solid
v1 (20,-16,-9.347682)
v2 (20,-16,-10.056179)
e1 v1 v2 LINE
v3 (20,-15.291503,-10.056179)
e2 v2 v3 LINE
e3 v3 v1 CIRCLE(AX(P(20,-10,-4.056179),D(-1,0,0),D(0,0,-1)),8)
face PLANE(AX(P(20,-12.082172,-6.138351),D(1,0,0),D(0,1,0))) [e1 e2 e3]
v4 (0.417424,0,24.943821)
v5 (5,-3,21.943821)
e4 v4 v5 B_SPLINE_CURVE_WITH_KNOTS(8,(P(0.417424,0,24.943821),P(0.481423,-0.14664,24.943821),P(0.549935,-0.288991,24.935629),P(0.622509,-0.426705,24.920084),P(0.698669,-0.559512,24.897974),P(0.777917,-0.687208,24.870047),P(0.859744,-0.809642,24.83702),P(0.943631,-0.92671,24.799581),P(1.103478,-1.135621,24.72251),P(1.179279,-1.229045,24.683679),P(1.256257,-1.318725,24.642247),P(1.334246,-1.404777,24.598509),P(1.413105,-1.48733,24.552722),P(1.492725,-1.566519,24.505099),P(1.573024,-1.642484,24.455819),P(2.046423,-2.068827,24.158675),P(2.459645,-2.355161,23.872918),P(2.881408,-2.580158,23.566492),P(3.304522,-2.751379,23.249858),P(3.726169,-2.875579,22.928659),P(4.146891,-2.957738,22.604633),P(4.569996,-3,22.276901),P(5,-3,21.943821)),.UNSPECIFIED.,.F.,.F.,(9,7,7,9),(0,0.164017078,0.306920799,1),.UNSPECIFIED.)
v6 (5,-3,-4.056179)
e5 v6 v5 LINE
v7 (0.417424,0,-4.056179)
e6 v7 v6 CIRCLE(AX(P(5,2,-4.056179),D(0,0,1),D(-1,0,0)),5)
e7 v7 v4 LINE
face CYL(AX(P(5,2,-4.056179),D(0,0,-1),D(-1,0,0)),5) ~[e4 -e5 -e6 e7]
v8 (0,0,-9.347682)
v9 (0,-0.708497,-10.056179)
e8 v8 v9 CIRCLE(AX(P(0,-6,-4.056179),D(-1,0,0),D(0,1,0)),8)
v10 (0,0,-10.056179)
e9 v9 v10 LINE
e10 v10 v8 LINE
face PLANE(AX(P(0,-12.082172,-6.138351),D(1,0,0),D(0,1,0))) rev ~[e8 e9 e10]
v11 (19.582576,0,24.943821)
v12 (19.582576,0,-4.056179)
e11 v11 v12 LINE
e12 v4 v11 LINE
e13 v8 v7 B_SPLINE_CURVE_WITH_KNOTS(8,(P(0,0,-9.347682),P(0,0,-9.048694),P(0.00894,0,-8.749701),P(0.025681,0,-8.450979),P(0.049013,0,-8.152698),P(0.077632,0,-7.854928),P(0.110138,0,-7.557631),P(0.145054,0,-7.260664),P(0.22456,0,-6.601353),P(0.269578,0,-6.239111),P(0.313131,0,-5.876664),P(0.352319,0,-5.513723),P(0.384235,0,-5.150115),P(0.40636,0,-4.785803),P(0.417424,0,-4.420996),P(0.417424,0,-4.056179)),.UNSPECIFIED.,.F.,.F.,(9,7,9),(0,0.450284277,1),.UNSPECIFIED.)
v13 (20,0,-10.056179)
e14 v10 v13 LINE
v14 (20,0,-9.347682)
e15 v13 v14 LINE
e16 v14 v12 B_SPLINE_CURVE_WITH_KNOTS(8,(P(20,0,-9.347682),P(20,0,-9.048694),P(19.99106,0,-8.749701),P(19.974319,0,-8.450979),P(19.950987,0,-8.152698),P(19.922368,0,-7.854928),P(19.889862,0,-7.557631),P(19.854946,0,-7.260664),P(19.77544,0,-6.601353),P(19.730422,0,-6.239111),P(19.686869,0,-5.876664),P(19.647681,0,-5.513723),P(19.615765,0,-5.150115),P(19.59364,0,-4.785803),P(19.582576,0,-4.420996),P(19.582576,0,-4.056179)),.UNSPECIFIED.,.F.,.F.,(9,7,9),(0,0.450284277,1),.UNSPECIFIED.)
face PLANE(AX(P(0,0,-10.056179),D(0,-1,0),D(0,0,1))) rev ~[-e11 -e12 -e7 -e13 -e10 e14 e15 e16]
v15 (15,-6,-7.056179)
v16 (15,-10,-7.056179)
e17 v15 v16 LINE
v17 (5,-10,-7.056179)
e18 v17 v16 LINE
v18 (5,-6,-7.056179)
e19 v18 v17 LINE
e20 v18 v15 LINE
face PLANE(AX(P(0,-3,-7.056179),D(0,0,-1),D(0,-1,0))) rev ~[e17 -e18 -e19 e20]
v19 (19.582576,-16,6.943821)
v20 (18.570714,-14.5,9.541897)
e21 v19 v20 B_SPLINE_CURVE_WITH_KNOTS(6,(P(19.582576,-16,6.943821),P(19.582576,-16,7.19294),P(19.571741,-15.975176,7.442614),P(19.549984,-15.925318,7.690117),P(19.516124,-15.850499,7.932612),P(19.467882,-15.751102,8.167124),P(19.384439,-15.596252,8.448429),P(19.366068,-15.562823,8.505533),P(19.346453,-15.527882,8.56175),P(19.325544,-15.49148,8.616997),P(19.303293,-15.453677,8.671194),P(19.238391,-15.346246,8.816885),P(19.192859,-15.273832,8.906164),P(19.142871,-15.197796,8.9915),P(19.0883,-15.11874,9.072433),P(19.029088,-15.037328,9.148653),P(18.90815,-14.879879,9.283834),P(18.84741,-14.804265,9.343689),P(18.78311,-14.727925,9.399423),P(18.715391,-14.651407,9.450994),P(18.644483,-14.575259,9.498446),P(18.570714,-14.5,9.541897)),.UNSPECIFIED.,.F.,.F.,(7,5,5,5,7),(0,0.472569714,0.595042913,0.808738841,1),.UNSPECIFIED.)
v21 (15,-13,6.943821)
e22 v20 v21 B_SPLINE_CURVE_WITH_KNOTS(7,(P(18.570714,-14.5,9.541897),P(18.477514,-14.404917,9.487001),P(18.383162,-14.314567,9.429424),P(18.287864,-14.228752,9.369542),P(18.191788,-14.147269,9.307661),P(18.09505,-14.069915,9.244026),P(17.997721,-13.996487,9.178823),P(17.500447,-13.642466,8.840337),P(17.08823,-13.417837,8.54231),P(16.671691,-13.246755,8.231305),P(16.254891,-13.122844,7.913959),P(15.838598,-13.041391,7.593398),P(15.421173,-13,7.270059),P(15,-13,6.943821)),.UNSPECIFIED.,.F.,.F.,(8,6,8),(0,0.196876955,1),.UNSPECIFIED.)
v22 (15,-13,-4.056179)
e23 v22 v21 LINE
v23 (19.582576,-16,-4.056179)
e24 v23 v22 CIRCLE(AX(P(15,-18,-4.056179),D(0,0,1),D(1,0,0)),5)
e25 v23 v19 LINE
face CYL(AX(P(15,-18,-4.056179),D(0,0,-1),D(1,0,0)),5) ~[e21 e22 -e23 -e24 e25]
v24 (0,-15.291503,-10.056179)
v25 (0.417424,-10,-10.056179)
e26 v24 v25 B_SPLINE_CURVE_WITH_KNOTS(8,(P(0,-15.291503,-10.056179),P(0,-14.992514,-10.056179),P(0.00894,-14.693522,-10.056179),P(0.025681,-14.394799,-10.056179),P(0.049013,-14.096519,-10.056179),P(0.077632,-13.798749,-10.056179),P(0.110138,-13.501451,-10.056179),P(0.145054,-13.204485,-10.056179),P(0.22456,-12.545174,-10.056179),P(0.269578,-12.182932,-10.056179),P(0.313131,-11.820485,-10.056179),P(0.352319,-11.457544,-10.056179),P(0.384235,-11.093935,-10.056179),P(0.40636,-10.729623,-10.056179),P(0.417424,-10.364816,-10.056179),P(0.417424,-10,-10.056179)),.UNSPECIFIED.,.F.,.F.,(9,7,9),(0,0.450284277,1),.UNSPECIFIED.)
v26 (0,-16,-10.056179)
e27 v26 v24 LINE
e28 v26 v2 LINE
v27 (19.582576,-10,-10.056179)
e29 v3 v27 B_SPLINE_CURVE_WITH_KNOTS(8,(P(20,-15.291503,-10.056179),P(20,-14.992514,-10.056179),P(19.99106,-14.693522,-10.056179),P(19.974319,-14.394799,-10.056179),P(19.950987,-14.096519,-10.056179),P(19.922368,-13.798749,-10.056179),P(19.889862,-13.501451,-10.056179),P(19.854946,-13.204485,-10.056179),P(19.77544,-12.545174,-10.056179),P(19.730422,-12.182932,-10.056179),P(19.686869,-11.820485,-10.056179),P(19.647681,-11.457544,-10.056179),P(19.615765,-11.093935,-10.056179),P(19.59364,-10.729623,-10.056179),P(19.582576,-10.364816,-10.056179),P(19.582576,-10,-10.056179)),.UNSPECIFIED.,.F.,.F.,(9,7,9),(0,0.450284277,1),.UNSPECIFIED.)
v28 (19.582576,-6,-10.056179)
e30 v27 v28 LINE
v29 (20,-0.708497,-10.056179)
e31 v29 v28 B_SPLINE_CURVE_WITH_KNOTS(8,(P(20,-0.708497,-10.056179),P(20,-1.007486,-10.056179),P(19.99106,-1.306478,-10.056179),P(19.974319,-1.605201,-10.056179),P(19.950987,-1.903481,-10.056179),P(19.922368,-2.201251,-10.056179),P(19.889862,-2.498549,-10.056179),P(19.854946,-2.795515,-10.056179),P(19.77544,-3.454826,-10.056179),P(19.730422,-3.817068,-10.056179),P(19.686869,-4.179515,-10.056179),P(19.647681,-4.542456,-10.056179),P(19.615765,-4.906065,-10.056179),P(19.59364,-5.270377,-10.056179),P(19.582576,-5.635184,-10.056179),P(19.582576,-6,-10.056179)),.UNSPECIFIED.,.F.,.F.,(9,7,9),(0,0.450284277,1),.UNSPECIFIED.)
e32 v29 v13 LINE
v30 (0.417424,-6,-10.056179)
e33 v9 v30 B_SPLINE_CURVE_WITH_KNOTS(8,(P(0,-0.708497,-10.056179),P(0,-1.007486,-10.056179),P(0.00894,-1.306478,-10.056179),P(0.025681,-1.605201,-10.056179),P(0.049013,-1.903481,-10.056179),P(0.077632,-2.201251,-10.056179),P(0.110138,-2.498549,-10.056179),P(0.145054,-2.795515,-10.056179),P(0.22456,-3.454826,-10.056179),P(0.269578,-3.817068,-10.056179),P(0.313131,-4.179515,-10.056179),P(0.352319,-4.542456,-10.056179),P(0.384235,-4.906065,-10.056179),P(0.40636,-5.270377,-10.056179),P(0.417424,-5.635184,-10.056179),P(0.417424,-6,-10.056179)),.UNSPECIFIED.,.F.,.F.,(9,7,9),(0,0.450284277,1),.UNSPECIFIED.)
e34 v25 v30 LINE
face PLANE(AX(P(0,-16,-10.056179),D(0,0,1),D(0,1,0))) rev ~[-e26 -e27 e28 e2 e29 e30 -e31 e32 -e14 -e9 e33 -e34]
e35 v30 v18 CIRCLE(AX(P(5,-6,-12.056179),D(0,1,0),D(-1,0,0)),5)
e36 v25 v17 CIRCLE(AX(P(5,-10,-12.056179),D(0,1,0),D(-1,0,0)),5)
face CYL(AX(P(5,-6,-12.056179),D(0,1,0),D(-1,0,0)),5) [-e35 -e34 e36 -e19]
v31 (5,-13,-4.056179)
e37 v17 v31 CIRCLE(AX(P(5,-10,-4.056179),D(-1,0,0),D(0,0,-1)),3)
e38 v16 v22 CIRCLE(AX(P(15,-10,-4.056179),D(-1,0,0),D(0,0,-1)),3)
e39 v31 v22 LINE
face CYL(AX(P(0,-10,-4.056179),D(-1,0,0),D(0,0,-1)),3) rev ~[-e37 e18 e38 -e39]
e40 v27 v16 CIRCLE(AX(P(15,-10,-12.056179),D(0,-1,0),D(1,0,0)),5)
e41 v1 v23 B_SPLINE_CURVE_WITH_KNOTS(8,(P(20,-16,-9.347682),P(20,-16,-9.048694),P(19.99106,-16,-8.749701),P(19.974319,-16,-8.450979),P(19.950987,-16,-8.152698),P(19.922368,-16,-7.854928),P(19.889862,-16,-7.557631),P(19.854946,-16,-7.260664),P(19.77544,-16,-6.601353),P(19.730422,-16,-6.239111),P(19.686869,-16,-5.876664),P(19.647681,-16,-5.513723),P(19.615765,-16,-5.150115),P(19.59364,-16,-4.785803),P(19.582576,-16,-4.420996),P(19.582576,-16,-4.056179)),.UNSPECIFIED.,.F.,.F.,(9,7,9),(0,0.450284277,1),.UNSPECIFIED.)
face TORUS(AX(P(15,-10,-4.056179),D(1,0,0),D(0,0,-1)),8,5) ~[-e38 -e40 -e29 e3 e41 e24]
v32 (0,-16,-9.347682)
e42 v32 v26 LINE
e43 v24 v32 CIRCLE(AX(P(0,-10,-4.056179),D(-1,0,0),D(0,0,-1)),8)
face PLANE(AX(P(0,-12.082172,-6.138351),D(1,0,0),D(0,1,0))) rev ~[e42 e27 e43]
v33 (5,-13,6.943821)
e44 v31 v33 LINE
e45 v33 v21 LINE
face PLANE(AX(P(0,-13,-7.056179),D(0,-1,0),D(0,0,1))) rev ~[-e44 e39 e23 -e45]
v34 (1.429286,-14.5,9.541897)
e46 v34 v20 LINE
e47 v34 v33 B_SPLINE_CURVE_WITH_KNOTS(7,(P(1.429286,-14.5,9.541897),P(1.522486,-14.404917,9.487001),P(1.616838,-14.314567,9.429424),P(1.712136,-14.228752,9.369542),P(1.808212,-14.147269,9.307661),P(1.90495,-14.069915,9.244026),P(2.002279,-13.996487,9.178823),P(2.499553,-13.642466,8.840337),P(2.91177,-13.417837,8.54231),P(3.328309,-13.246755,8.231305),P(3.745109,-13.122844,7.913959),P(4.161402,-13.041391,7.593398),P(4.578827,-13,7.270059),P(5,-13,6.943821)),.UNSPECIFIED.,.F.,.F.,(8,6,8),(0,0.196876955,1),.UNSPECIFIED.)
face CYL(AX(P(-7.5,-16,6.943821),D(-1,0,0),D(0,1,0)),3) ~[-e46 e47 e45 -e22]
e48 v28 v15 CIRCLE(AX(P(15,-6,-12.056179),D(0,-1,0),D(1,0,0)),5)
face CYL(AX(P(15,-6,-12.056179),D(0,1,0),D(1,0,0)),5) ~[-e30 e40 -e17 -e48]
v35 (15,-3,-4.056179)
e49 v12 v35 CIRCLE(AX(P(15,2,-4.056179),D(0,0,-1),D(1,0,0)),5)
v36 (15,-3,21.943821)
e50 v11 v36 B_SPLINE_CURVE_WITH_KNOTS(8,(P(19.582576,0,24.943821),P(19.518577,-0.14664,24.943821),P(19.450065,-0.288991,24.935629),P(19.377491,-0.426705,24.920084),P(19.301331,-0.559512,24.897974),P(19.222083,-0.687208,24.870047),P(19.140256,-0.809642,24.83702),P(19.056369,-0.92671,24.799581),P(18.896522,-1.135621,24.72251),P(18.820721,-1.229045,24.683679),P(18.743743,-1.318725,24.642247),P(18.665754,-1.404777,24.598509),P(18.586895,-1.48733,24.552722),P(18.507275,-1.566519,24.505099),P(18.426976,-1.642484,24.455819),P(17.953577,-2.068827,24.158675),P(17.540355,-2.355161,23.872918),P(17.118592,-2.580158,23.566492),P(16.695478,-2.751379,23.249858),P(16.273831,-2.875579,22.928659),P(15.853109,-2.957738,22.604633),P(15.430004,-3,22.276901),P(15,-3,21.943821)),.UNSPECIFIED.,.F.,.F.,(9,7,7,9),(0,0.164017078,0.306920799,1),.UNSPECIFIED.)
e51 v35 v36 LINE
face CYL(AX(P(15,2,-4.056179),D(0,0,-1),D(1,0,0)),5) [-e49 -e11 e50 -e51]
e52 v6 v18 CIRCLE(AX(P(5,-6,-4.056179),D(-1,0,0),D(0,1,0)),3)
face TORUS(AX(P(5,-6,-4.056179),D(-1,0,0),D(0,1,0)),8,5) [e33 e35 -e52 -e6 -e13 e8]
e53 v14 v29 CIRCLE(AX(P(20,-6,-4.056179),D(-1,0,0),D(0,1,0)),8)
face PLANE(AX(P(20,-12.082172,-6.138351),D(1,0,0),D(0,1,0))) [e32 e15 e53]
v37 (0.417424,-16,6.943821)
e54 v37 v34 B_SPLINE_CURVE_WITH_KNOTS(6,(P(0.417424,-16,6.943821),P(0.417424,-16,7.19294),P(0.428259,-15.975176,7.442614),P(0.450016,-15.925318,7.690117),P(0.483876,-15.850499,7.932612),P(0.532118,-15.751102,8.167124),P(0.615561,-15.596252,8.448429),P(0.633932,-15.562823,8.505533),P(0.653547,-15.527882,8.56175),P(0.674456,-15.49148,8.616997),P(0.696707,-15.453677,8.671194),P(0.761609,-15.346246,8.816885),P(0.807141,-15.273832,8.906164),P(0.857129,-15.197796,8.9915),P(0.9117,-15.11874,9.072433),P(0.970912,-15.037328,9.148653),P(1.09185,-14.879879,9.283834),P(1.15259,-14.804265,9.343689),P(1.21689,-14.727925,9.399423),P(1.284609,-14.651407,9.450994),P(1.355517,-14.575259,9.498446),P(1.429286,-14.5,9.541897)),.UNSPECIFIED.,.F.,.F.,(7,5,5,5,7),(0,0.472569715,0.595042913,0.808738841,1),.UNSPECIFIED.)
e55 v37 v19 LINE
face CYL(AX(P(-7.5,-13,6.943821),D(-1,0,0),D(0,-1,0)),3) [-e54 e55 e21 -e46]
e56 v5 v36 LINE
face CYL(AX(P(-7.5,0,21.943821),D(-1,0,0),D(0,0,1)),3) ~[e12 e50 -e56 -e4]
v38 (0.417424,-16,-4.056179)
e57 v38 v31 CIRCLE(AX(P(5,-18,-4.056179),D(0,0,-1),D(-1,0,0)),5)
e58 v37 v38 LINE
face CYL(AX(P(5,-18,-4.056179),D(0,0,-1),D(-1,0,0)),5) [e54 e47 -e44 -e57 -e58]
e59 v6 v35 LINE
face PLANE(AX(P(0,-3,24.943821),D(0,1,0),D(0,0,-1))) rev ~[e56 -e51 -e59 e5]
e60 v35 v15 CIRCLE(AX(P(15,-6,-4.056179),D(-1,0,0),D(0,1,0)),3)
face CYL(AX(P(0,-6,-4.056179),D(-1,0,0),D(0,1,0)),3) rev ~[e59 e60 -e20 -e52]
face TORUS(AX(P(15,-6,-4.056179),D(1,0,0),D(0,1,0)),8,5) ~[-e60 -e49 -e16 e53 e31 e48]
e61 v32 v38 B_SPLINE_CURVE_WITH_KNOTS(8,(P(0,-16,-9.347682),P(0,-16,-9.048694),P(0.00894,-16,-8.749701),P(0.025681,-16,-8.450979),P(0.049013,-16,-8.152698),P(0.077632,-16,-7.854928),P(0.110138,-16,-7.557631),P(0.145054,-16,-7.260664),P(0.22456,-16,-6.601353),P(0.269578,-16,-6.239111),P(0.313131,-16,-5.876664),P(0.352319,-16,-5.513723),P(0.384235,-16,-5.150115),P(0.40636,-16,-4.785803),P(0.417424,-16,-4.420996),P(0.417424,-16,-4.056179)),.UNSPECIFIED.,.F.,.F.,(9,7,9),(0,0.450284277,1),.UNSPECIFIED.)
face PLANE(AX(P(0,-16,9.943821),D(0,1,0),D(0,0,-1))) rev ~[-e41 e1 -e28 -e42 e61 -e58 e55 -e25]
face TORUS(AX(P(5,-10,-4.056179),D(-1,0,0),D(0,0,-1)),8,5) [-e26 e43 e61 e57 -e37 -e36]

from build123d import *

# Parameters (mm, degrees)
F1_DEPTH     = 20
F2_T1_DEPTH  = 20
F2_T3_DEPTH  = 35
F3_T1_DEPTH  = 4
F3_T3_DEPTH  = 23.5
F3_T5_DEPTH  = 38.5
F3_T8_ANGLE  = 89.9999999987
F3_T10_ANGLE = 89.9999999987
F3_T12_ANGLE = 89.9999999987
F3_T14_ANGLE = 89.9999999987
F3_T18_ANGLE = 359.64
F3_S19_R     = 5
F3_T20_DEPTH = 6
F3_T24_ANGLE = 359.64
F3_S25_R     = 5
F3_T26_DEPTH = 6
F3_T30_ANGLE = 328.8283154119
F3_S31_R     = 5
F3_T32_DEPTH = 6
F3_T36_ANGLE = 328.8283154119
F3_S37_R     = 5
F3_T38_DEPTH = 6


# Not quite as in the source:
# - a fillet or chamfer that OpenCascade refuses, or shapes differently, is made with other operations: its cross-section is extruded or revolved along the edge and cut away or added


with BuildPart() as f1:
    # F0 (on Right) → F1 (new body)
    with BuildSketch(Plane.YZ):
        Polygon((0, -10.05617938), (0, 24.94382062), (-3, 24.94382062), (-3, -7.05617938), (-13, -7.05617938), (-13, 9.94382062), (-16, 9.94382062), (-16, -10.05617938), align=None)
    extrude(amount=F1_DEPTH)

    # F2: fillet of radius 3 on 5 edges, made by hand

    # F2_s2 → F2_t1 (join)
    with BuildSketch(Plane.YZ):
        with BuildLine():
            ThreePointArc((-10, -7.05617938), (-12.1213203436, -6.1774997235), (-13, -4.05617938))
            Line((-13, -4.05617938), (-13, -7.05617938))
            Line((-13, -7.05617938), (-10, -7.05617938))
        make_face()
        with BuildLine():
            ThreePointArc((-3, -4.05617938), (-3.8786796564, -6.1774997235), (-6, -7.05617938))
            Line((-6, -7.05617938), (-3, -7.05617938))
            Line((-3, -7.05617938), (-3, -4.05617938))
        make_face()
    extrude(amount=F2_T1_DEPTH)

    # F2_s4 → F2_t3 (cut)
    with BuildSketch(Plane.YZ.offset(-7.5)):
        with BuildLine():
            ThreePointArc((0, 24.94382062), (-2.1213203436, 24.0651409636), (-3, 21.94382062))
            Line((-3, 21.94382062), (-3, 24.94382062))
            Line((-3, 24.94382062), (0, 24.94382062))
        make_face()
        with BuildLine():
            ThreePointArc((-13, 6.94382062), (-13.8786796564, 9.0651409636), (-16, 9.94382062))
            Line((-16, 9.94382062), (-13, 9.94382062))
            Line((-13, 9.94382062), (-13, 6.94382062))
        make_face()
        with BuildLine():
            ThreePointArc((-16, 6.94382062), (-15.1213203436, 9.0651409636), (-13, 9.94382062))
            Line((-13, 9.94382062), (-16, 9.94382062))
            Line((-16, 9.94382062), (-16, 6.94382062))
        make_face()
    extrude(amount=F2_T3_DEPTH, mode=Mode.SUBTRACT)

    # F3: fillet of radius 5 on 4 edges, made by hand

    # F3_s2 → F3_t1 (cut)
    with BuildSketch(Plane.XZ.offset(6)):
        with BuildLine():
            ThreePointArc((20, -12.05617938), (18.5355339059, -8.520645474), (15, -7.05617938))
            Line((15, -7.05617938), (20, -7.05617938))
            Line((20, -7.05617938), (20, -12.05617938))
        make_face()
        with BuildLine():
            ThreePointArc((0, -12.05617938), (1.4644660941, -8.520645474), (5, -7.05617938))
            Line((5, -7.05617938), (0, -7.05617938))
            Line((0, -7.05617938), (0, -12.05617938))
        make_face()
    extrude(amount=F3_T1_DEPTH, mode=Mode.SUBTRACT)

    # F3_s4 → F3_t3 (cut)
    with BuildSketch(Plane.XY.offset(-4.05617938)):
        with BuildLine():
            ThreePointArc((20, -18), (18.5355339059, -14.4644660941), (15, -13))
            Line((15, -13), (20, -13))
            Line((20, -13), (20, -18))
        make_face()
        with BuildLine():
            ThreePointArc((0, -18), (1.4644660941, -14.4644660941), (5, -13))
            Line((5, -13), (0, -13))
            Line((0, -13), (0, -18))
        make_face()
    extrude(amount=F3_T3_DEPTH, mode=Mode.SUBTRACT)

    # F3_s6 → F3_t5 (cut)
    with BuildSketch(Plane.XY.offset(-4.05617938)):
        with BuildLine():
            ThreePointArc((20, 2), (18.5355339059, -1.5355339059), (15, -3))
            Line((15, -3), (20, -3))
            Line((20, -3), (20, 2))
        make_face()
        with BuildLine():
            ThreePointArc((0, 2), (1.4644660941, -1.5355339059), (5, -3))
            Line((5, -3), (0, -3))
            Line((0, -3), (0, 2))
        make_face()
    extrude(amount=F3_T5_DEPTH, mode=Mode.SUBTRACT)

    # F3_s7 → F3_t8 (revolve, cut)
    with BuildSketch(Plane.XY.offset(-4.05617938)):
        with BuildLine():
            ThreePointArc((0, 2), (1.4644660941, -1.5355339059), (5, -3))
            Line((5, -3), (0, -3))
            Line((0, -3), (0, 2))
        make_face()
    revolve(axis=Axis((0, -6, -4.05617938), (-1, 0, 0)), revolution_arc=F3_T8_ANGLE, mode=Mode.SUBTRACT)

    # F3_s9 → F3_t10 (revolve, cut)
    with BuildSketch(Plane.XY.offset(-4.05617938)):
        with BuildLine():
            ThreePointArc((20, 2), (18.5355339059, -1.5355339059), (15, -3))
            Line((15, -3), (20, -3))
            Line((20, -3), (20, 2))
        make_face()
    revolve(axis=Axis((20, -6, -4.05617938), (-1, 0, 0)), revolution_arc=F3_T10_ANGLE, mode=Mode.SUBTRACT)

    # F3_s11 → F3_t12 (revolve, cut)
    with BuildSketch(Plane.XZ.offset(10)):
        with BuildLine():
            ThreePointArc((0, -12.05617938), (1.4644660941, -8.5206454741), (5, -7.05617938))
            Line((5, -7.05617938), (0, -7.05617938))
            Line((0, -7.05617938), (0, -12.05617938))
        make_face()
    revolve(axis=Axis((0, -10, -4.05617938), (-1, 0, 0)), revolution_arc=F3_T12_ANGLE, mode=Mode.SUBTRACT)

    # F3_s13 → F3_t14 (revolve, cut)
    with BuildSketch(Plane.XZ.offset(10)):
        with BuildLine():
            ThreePointArc((20, -12.05617938), (18.5355339059, -8.5206454741), (15, -7.05617938))
            Line((15, -7.05617938), (20, -7.05617938))
            Line((20, -7.05617938), (20, -12.05617938))
        make_face()
    revolve(axis=Axis((20, -10, -4.05617938), (-1, 0, 0)), revolution_arc=F3_T14_ANGLE, mode=Mode.SUBTRACT)


with BuildPart() as f3_tool16:
    # F3_s17 → F3_t18 (revolve)
    with BuildSketch(Plane(origin=(0, 0.0429965174, 6.8430181729), x_dir=(1, 0, 0), z_dir=(0, 0.006283144, 0.9999802609))):
        with BuildLine():
            ThreePointArc((19.5825756949, -16.0433131985), (17.7386127875, -13.8600130659), (15, -13.0433131986))
            Line((15, -13.0433131986), (20, -13.0433131986))
            Line((20, -13.0433131986), (20, -16.0433131985))
            Line((20, -16.0433131985), (19.5825756949, -16.0433131985))
        make_face()
    revolve(axis=Axis((20, -15.9999999999, 6.9438206201), (-1, 0, 0)), revolution_arc=F3_T18_ANGLE)

    # F3_s19 → F3_t20 (cut, symmetric)
    with BuildSketch(Plane.XY.offset(6.9)):
        with Locations((15, -18)):
            Circle(F3_S19_R)
    extrude(amount=F3_T20_DEPTH, both=True, mode=Mode.SUBTRACT)


with BuildPart() as f1_1:
    add(f1.part)

    # F3_t15: cut F3_tool16
    add(f3_tool16.part, mode=Mode.SUBTRACT)


with BuildPart() as f3_tool22:
    # F3_s23 → F3_t24 (revolve)
    with BuildSketch(Plane(origin=(0, 0.0429965174, 6.8430181729), x_dir=(1, 0, 0), z_dir=(0, 0.006283144, 0.9999802609))):
        with BuildLine():
            ThreePointArc((0.4174243051, -16.0433131985), (2.2613872125, -13.8600130659), (5, -13.0433131986))
            Line((5, -13.0433131986), (0, -13.0433131986))
            Line((0, -13.0433131986), (0, -16.0433131985))
            Line((0, -16.0433131985), (0.4174243051, -16.0433131985))
        make_face()
    revolve(axis=Axis((0, -15.9999999999, 6.9438206201), (-1, 0, 0)), revolution_arc=F3_T24_ANGLE)

    # F3_s25 → F3_t26 (cut, symmetric)
    with BuildSketch(Plane.XY.offset(6.9)):
        with Locations((5, -18)):
            Circle(F3_S25_R)
    extrude(amount=F3_T26_DEPTH, both=True, mode=Mode.SUBTRACT)


with BuildPart() as f1_2:
    add(f1_1.part)

    # F3_t21: cut F3_tool22
    add(f3_tool22.part, mode=Mode.SUBTRACT)


with BuildPart() as f3_tool28:
    # F3_s29 → F3_t30 (revolve)
    with BuildSketch(Plane.XY.offset(21.9438206201)):
        with BuildLine():
            ThreePointArc((15, -3), (17.7386127875, -2.1833001327), (19.5825756949, -1e-10))
            Line((19.5825756949, -1e-10), (20, -1e-10))
            Line((20, -1e-10), (20, -3))
            Line((20, -3), (15, -3))
        make_face()
    revolve(axis=Axis((20, -1e-10, 21.9438206201), (-1, 0, 0)), revolution_arc=F3_T30_ANGLE)

    # F3_s31 → F3_t32 (cut, symmetric)
    with BuildSketch(Plane.XY.offset(21.9)):
        with Locations((15, 2)):
            Circle(F3_S31_R)
    extrude(amount=F3_T32_DEPTH, both=True, mode=Mode.SUBTRACT)


with BuildPart() as f1_3:
    add(f1_2.part)

    # F3_t27: cut F3_tool28
    add(f3_tool28.part, mode=Mode.SUBTRACT)


with BuildPart() as f3_tool34:
    # F3_s35 → F3_t36 (revolve)
    with BuildSketch(Plane.XY.offset(21.9438206201)):
        with BuildLine():
            ThreePointArc((5, -3), (2.2613872125, -2.1833001327), (0.4174243051, -1e-10))
            Line((0.4174243051, -1e-10), (0, -1e-10))
            Line((0, -1e-10), (0, -3))
            Line((0, -3), (5, -3))
        make_face()
    revolve(axis=Axis((0, -1e-10, 21.9438206201), (-1, 0, 0)), revolution_arc=F3_T36_ANGLE)

    # F3_s37 → F3_t38 (cut, symmetric)
    with BuildSketch(Plane.XY.offset(21.9)):
        with Locations((5, 2)):
            Circle(F3_S37_R)
    extrude(amount=F3_T38_DEPTH, both=True, mode=Mode.SUBTRACT)


with BuildPart() as f1_4:
    add(f1_3.part)

    # F3_t33: cut F3_tool34
    add(f3_tool34.part, mode=Mode.SUBTRACT)


solid = f1_4.part
